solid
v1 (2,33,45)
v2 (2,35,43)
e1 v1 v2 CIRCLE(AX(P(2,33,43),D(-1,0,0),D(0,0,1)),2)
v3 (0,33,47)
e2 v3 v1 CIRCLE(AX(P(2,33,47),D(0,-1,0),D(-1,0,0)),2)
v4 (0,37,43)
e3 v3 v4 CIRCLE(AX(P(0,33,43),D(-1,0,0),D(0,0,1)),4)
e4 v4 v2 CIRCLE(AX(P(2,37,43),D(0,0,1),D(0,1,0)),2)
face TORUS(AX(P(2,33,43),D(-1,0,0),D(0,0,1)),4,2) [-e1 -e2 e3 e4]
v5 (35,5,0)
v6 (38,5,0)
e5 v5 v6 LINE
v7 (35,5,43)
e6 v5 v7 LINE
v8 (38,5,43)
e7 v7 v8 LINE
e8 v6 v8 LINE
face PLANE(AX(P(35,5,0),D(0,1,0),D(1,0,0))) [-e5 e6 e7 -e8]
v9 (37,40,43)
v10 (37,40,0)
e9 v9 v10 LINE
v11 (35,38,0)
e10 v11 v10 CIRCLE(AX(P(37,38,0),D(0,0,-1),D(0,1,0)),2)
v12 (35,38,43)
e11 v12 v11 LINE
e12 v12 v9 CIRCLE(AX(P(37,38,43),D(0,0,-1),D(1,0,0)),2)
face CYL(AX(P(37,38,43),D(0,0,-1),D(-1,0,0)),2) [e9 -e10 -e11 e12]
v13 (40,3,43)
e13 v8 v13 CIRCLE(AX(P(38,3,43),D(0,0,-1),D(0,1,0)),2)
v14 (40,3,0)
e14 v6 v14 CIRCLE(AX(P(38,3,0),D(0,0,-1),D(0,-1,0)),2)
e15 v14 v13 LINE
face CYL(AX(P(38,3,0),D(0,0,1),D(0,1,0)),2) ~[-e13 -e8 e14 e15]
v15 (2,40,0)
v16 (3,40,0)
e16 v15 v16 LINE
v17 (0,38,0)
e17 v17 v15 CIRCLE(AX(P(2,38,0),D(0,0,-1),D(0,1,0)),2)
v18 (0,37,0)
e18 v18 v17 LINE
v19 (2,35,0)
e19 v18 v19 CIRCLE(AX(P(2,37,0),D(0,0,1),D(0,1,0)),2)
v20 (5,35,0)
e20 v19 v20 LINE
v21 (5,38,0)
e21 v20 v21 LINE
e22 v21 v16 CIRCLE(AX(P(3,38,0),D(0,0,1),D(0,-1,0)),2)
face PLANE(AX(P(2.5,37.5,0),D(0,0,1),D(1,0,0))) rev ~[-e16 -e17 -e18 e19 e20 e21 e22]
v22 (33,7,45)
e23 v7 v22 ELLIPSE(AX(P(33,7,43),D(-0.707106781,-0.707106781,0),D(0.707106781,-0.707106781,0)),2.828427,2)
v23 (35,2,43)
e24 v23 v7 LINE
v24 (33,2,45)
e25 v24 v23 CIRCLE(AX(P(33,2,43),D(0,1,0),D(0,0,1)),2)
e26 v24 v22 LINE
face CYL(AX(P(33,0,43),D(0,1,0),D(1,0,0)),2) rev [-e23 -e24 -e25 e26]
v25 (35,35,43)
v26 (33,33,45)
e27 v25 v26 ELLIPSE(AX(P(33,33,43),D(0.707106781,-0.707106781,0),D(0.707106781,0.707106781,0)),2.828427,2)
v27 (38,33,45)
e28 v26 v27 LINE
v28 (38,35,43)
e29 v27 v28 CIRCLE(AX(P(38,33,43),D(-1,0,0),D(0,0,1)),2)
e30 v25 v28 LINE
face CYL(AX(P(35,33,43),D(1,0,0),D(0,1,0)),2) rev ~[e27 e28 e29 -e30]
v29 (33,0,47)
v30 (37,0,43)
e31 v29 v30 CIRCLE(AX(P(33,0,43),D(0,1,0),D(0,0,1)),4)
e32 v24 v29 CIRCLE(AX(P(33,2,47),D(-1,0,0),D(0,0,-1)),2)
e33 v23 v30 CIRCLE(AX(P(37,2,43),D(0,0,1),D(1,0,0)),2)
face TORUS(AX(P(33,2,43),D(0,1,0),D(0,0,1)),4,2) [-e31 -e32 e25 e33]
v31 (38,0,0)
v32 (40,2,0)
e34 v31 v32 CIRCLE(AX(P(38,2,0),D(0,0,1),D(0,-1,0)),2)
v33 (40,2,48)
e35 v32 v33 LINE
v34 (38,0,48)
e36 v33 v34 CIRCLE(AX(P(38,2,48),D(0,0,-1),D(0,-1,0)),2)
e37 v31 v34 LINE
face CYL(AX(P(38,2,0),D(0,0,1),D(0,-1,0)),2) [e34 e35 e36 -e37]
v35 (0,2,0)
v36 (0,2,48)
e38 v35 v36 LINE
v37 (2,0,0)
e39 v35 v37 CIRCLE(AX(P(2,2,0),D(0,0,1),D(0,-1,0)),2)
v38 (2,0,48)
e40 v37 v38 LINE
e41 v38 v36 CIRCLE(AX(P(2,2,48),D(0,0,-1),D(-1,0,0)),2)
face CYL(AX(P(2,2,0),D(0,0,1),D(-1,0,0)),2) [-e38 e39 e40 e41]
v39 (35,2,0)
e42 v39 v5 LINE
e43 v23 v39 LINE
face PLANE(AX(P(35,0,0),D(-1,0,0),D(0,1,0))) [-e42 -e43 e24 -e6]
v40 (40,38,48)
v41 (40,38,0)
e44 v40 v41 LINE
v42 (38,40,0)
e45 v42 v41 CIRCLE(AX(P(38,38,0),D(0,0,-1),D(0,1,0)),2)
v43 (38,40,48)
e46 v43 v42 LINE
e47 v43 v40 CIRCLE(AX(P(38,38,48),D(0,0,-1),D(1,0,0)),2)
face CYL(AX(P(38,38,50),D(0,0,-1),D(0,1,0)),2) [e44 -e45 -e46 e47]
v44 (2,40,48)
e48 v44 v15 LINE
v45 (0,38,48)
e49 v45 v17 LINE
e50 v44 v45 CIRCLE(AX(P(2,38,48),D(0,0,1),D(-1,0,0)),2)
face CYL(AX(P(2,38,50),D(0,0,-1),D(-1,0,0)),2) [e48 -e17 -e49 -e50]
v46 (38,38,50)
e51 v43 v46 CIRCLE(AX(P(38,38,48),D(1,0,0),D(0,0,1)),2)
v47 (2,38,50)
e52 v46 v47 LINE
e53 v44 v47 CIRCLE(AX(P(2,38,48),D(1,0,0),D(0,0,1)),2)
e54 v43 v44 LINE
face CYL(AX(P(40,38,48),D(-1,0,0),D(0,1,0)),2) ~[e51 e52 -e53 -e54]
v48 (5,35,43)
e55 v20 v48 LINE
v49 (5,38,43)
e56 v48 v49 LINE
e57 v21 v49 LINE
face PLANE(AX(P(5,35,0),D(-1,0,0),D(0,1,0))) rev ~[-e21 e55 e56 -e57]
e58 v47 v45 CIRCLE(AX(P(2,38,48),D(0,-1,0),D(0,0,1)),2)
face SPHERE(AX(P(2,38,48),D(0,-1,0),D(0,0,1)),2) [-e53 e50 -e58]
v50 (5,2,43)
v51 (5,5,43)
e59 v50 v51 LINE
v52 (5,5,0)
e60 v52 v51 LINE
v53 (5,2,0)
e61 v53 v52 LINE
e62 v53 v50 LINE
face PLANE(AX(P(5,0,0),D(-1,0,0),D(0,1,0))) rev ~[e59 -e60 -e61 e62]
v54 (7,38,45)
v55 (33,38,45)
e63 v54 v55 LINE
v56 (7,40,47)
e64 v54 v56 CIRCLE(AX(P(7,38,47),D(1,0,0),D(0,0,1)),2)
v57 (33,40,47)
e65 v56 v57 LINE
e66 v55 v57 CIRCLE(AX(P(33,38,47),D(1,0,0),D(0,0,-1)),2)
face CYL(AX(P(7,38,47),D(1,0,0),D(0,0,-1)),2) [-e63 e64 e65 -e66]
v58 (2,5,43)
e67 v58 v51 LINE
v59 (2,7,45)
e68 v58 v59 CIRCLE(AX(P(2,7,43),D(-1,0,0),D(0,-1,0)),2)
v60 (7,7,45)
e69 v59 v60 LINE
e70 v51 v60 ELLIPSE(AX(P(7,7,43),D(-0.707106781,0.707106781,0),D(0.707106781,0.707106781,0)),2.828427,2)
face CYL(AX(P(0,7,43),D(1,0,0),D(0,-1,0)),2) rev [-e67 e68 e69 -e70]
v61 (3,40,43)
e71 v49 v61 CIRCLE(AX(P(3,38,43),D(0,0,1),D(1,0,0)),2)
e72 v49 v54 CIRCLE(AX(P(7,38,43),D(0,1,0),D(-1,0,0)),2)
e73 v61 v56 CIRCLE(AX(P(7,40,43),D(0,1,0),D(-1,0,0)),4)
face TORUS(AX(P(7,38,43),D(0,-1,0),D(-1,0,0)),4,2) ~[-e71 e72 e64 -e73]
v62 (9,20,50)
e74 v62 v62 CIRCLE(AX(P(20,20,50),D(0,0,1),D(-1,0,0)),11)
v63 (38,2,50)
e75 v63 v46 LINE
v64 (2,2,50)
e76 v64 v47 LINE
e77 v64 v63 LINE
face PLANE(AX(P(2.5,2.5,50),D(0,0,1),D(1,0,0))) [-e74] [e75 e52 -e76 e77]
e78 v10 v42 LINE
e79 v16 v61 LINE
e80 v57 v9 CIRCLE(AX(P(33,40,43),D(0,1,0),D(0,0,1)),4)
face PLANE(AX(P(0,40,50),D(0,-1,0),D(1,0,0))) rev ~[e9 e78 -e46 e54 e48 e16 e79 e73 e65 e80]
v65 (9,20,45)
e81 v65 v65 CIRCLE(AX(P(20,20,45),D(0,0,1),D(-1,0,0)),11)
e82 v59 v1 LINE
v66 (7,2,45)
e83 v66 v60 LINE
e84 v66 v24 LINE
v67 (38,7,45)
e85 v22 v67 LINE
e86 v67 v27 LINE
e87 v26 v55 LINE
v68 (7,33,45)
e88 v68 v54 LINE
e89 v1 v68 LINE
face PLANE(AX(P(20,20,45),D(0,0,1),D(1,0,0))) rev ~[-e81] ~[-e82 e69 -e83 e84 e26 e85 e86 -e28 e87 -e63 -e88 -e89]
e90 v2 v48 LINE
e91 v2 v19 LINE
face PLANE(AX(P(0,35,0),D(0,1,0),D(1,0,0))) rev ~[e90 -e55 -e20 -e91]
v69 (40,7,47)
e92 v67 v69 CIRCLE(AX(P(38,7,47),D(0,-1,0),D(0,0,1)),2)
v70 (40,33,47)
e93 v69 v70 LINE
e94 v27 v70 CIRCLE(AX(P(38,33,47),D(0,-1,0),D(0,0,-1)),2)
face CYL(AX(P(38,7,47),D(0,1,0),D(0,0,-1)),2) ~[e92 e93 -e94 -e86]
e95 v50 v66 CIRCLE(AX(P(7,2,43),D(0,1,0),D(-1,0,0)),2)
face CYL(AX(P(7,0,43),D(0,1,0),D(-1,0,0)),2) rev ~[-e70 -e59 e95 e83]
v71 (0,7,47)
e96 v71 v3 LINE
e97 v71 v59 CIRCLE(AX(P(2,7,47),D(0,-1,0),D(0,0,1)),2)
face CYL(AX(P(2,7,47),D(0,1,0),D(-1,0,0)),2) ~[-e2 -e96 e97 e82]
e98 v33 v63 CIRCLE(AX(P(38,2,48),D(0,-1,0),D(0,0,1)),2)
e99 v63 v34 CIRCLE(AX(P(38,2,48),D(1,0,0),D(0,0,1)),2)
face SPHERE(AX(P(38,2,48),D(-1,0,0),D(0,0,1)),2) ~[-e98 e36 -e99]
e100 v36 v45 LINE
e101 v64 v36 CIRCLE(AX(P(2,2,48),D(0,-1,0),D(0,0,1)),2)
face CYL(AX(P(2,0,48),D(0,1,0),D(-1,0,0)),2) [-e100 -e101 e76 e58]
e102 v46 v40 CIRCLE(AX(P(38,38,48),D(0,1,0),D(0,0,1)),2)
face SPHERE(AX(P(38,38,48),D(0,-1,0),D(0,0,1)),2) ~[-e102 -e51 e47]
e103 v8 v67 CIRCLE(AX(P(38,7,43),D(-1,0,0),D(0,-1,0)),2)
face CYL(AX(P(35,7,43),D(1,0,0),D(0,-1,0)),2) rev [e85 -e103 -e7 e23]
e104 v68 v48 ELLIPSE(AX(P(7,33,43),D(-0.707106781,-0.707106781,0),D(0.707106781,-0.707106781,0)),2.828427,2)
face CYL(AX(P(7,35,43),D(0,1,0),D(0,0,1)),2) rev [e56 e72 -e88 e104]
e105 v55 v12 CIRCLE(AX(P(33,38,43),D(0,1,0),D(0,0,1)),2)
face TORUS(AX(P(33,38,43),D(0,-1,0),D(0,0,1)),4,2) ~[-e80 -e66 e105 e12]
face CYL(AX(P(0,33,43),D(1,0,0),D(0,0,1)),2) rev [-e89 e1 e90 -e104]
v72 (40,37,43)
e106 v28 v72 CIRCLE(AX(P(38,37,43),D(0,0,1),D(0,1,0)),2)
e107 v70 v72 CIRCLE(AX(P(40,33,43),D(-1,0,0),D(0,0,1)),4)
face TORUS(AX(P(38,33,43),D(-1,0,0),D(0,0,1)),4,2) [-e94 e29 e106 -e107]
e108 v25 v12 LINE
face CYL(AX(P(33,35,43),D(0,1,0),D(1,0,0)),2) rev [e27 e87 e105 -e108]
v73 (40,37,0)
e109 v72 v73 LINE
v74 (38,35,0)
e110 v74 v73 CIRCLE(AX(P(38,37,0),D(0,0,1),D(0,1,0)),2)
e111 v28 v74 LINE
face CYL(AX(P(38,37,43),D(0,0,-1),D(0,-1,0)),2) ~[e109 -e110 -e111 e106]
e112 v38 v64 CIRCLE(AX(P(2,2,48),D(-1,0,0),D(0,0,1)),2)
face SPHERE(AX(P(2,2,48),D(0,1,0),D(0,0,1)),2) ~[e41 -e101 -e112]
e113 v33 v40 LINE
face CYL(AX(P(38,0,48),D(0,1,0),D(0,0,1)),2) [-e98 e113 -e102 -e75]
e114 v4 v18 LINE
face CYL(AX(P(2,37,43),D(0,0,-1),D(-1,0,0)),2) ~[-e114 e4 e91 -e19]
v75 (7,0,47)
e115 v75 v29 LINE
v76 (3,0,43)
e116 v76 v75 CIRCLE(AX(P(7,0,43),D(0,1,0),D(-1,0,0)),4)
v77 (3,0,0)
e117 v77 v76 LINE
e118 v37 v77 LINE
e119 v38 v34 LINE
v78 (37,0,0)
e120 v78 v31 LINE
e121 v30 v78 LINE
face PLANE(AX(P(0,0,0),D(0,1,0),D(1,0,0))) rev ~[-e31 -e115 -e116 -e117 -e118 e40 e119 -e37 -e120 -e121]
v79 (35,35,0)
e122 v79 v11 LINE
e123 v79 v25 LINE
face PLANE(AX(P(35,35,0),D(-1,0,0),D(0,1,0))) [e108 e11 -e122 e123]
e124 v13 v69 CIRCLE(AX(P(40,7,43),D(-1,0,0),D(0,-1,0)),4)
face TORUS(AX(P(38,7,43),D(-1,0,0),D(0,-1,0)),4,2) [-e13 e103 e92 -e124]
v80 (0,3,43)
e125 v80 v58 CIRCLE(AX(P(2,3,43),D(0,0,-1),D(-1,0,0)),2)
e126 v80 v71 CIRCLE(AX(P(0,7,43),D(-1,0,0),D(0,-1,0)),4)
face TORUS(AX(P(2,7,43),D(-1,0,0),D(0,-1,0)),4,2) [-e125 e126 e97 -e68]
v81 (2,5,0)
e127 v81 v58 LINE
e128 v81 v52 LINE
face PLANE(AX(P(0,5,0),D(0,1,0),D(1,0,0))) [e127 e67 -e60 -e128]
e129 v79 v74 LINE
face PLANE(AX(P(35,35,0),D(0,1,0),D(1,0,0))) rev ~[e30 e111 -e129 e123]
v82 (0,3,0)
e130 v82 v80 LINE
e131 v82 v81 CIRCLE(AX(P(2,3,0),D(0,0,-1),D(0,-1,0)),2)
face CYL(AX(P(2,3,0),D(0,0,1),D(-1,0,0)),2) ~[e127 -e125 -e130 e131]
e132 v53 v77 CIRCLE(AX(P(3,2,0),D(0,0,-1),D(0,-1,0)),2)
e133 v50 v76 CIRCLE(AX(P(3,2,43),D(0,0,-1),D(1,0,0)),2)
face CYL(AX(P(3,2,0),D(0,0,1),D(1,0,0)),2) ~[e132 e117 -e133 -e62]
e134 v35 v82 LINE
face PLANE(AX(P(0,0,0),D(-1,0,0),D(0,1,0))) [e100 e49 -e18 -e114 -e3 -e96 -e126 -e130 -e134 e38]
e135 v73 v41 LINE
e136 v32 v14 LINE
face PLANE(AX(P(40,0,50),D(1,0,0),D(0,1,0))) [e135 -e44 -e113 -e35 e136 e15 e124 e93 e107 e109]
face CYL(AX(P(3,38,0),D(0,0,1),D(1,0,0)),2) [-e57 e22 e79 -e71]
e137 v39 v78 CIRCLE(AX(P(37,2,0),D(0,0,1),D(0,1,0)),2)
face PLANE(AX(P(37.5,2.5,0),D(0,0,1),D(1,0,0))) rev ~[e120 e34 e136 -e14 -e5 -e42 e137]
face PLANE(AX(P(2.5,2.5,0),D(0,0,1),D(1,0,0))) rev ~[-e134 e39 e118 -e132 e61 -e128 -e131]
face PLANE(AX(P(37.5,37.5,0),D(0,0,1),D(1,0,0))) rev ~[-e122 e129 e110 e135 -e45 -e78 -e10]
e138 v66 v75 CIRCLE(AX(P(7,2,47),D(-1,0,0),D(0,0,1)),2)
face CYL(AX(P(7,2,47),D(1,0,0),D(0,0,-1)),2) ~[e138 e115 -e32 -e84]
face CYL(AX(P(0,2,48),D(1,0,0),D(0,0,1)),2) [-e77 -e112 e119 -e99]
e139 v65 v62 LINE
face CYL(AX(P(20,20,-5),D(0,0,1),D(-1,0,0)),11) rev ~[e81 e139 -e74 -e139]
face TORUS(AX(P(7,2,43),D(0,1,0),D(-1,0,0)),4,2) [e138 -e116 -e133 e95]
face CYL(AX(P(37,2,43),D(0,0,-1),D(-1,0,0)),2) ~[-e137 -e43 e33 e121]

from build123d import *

# Parameters (mm, degrees)
F0_W     = 5
F0_H     = 5
F1_DEPTH = 50
F2_W     = 40
F2_H     = 40
F3_DEPTH = 5
F4_F1_R  = 2
F4_F2_R  = 2
F5_D     = 22
F5_DEPTH = 50
F5_START = 45
F5_TIP   = 6.6094668093


with BuildPart() as f1:
    # F0 (on Top) → F1 (new body)
    with BuildSketch(Plane.XY):
        with Locations((2.5, 2.5)):
            Rectangle(F0_W, F0_H)
    extrude(amount=F1_DEPTH)



with BuildPart() as f1b:
    # F0 (on Top) → F1, piece 2 (new body)
    with BuildSketch(Plane.XY):
        with Locations((37.5, 2.5)):
            Rectangle(F0_W, F0_H)
    extrude(amount=F1_DEPTH)


with BuildPart() as f1c:
    # F0 (on Top) → F1, piece 3 (new body)
    with BuildSketch(Plane.XY):
        with Locations((37.5, 37.5)):
            Rectangle(F0_W, F0_H)
    extrude(amount=F1_DEPTH)


with BuildPart() as f1d:
    # F0 (on Top) → F1, piece 4 (new body)
    with BuildSketch(Plane.XY):
        with Locations((2.5, 37.5)):
            Rectangle(F0_W, F0_H)
    extrude(amount=F1_DEPTH)


with BuildPart() as f1_1:
    add(f1.part)

    add(f1b.part)  # F3 merges F1b

    add(f1c.part)  # F3 merges F1c

    add(f1d.part)  # F3 merges F1d
    # F2 (on face) → F3 (join)
    with BuildSketch(Plane.XY.offset(50)):
        with Locations((20, 20)):
            Rectangle(F2_W, F2_H)
    extrude(amount=-F3_DEPTH)

    # F4: fillet of radius 2 on 20 edges, made by hand

    # F4_f1
    f4_f1_edges = [f1_1.edges().sort_by_distance(p)[0] for p in [
        (37.5, 5, 45),
        (35, 2.5, 45),
        (5, 2.5, 45),
        (2.5, 5, 45),
        (2.5, 35, 45),
        (5, 37.5, 45),
        (35, 37.5, 45),
        (37.5, 35, 45),
    ]]
    fillet(f4_f1_edges, radius=F4_F1_R)

    # F4_f2
    f4_f2_edges = [f1_1.edges().sort_by_distance(p)[0] for p in [
        (0, 20, 50),
        (20, 0, 50),
        (40, 20, 50),
        (20, 40, 50),
        (0, 0, 25),
        (40, 0, 25),
        (40, 40, 25),
        (20, 0, 45),
        (0, 20, 45),
        (20, 40, 45),
        (40, 20, 45),
        (0, 40, 25),
        (40, 5.5857864376, 44.4142135624),
        (40, 34.4142135624, 44.4142135624),
        (34.4142135624, 40, 44.4142135624),
        (5.5857864376, 40, 44.4142135624),
        (0, 34.4142135624, 44.4142135624),
        (0, 5.5857864376, 44.4142135624),
        (5.5857864376, 0, 44.4142135624),
        (34.4142135624, 0, 44.4142135624),
    ]]
    fillet(f4_f2_edges, radius=F4_F2_R)

    # F5
    # its depths count from where the whole tool has entered the part; down to there all is cleared
    with Locations(Plane(origin=(0, 0, 0), x_dir=(1, 0, 0), z_dir=(0, 0, -1)).offset(-F5_START)):
        with Locations((20, -20)):
            Hole(F5_D / 2, depth=F5_DEPTH)
            with Locations((0, 0, -(F5_DEPTH + F5_TIP / 2))):  # 118° drill point
                Cone(0, F5_D / 2, F5_TIP, mode=Mode.SUBTRACT)


solid = f1_1.part
